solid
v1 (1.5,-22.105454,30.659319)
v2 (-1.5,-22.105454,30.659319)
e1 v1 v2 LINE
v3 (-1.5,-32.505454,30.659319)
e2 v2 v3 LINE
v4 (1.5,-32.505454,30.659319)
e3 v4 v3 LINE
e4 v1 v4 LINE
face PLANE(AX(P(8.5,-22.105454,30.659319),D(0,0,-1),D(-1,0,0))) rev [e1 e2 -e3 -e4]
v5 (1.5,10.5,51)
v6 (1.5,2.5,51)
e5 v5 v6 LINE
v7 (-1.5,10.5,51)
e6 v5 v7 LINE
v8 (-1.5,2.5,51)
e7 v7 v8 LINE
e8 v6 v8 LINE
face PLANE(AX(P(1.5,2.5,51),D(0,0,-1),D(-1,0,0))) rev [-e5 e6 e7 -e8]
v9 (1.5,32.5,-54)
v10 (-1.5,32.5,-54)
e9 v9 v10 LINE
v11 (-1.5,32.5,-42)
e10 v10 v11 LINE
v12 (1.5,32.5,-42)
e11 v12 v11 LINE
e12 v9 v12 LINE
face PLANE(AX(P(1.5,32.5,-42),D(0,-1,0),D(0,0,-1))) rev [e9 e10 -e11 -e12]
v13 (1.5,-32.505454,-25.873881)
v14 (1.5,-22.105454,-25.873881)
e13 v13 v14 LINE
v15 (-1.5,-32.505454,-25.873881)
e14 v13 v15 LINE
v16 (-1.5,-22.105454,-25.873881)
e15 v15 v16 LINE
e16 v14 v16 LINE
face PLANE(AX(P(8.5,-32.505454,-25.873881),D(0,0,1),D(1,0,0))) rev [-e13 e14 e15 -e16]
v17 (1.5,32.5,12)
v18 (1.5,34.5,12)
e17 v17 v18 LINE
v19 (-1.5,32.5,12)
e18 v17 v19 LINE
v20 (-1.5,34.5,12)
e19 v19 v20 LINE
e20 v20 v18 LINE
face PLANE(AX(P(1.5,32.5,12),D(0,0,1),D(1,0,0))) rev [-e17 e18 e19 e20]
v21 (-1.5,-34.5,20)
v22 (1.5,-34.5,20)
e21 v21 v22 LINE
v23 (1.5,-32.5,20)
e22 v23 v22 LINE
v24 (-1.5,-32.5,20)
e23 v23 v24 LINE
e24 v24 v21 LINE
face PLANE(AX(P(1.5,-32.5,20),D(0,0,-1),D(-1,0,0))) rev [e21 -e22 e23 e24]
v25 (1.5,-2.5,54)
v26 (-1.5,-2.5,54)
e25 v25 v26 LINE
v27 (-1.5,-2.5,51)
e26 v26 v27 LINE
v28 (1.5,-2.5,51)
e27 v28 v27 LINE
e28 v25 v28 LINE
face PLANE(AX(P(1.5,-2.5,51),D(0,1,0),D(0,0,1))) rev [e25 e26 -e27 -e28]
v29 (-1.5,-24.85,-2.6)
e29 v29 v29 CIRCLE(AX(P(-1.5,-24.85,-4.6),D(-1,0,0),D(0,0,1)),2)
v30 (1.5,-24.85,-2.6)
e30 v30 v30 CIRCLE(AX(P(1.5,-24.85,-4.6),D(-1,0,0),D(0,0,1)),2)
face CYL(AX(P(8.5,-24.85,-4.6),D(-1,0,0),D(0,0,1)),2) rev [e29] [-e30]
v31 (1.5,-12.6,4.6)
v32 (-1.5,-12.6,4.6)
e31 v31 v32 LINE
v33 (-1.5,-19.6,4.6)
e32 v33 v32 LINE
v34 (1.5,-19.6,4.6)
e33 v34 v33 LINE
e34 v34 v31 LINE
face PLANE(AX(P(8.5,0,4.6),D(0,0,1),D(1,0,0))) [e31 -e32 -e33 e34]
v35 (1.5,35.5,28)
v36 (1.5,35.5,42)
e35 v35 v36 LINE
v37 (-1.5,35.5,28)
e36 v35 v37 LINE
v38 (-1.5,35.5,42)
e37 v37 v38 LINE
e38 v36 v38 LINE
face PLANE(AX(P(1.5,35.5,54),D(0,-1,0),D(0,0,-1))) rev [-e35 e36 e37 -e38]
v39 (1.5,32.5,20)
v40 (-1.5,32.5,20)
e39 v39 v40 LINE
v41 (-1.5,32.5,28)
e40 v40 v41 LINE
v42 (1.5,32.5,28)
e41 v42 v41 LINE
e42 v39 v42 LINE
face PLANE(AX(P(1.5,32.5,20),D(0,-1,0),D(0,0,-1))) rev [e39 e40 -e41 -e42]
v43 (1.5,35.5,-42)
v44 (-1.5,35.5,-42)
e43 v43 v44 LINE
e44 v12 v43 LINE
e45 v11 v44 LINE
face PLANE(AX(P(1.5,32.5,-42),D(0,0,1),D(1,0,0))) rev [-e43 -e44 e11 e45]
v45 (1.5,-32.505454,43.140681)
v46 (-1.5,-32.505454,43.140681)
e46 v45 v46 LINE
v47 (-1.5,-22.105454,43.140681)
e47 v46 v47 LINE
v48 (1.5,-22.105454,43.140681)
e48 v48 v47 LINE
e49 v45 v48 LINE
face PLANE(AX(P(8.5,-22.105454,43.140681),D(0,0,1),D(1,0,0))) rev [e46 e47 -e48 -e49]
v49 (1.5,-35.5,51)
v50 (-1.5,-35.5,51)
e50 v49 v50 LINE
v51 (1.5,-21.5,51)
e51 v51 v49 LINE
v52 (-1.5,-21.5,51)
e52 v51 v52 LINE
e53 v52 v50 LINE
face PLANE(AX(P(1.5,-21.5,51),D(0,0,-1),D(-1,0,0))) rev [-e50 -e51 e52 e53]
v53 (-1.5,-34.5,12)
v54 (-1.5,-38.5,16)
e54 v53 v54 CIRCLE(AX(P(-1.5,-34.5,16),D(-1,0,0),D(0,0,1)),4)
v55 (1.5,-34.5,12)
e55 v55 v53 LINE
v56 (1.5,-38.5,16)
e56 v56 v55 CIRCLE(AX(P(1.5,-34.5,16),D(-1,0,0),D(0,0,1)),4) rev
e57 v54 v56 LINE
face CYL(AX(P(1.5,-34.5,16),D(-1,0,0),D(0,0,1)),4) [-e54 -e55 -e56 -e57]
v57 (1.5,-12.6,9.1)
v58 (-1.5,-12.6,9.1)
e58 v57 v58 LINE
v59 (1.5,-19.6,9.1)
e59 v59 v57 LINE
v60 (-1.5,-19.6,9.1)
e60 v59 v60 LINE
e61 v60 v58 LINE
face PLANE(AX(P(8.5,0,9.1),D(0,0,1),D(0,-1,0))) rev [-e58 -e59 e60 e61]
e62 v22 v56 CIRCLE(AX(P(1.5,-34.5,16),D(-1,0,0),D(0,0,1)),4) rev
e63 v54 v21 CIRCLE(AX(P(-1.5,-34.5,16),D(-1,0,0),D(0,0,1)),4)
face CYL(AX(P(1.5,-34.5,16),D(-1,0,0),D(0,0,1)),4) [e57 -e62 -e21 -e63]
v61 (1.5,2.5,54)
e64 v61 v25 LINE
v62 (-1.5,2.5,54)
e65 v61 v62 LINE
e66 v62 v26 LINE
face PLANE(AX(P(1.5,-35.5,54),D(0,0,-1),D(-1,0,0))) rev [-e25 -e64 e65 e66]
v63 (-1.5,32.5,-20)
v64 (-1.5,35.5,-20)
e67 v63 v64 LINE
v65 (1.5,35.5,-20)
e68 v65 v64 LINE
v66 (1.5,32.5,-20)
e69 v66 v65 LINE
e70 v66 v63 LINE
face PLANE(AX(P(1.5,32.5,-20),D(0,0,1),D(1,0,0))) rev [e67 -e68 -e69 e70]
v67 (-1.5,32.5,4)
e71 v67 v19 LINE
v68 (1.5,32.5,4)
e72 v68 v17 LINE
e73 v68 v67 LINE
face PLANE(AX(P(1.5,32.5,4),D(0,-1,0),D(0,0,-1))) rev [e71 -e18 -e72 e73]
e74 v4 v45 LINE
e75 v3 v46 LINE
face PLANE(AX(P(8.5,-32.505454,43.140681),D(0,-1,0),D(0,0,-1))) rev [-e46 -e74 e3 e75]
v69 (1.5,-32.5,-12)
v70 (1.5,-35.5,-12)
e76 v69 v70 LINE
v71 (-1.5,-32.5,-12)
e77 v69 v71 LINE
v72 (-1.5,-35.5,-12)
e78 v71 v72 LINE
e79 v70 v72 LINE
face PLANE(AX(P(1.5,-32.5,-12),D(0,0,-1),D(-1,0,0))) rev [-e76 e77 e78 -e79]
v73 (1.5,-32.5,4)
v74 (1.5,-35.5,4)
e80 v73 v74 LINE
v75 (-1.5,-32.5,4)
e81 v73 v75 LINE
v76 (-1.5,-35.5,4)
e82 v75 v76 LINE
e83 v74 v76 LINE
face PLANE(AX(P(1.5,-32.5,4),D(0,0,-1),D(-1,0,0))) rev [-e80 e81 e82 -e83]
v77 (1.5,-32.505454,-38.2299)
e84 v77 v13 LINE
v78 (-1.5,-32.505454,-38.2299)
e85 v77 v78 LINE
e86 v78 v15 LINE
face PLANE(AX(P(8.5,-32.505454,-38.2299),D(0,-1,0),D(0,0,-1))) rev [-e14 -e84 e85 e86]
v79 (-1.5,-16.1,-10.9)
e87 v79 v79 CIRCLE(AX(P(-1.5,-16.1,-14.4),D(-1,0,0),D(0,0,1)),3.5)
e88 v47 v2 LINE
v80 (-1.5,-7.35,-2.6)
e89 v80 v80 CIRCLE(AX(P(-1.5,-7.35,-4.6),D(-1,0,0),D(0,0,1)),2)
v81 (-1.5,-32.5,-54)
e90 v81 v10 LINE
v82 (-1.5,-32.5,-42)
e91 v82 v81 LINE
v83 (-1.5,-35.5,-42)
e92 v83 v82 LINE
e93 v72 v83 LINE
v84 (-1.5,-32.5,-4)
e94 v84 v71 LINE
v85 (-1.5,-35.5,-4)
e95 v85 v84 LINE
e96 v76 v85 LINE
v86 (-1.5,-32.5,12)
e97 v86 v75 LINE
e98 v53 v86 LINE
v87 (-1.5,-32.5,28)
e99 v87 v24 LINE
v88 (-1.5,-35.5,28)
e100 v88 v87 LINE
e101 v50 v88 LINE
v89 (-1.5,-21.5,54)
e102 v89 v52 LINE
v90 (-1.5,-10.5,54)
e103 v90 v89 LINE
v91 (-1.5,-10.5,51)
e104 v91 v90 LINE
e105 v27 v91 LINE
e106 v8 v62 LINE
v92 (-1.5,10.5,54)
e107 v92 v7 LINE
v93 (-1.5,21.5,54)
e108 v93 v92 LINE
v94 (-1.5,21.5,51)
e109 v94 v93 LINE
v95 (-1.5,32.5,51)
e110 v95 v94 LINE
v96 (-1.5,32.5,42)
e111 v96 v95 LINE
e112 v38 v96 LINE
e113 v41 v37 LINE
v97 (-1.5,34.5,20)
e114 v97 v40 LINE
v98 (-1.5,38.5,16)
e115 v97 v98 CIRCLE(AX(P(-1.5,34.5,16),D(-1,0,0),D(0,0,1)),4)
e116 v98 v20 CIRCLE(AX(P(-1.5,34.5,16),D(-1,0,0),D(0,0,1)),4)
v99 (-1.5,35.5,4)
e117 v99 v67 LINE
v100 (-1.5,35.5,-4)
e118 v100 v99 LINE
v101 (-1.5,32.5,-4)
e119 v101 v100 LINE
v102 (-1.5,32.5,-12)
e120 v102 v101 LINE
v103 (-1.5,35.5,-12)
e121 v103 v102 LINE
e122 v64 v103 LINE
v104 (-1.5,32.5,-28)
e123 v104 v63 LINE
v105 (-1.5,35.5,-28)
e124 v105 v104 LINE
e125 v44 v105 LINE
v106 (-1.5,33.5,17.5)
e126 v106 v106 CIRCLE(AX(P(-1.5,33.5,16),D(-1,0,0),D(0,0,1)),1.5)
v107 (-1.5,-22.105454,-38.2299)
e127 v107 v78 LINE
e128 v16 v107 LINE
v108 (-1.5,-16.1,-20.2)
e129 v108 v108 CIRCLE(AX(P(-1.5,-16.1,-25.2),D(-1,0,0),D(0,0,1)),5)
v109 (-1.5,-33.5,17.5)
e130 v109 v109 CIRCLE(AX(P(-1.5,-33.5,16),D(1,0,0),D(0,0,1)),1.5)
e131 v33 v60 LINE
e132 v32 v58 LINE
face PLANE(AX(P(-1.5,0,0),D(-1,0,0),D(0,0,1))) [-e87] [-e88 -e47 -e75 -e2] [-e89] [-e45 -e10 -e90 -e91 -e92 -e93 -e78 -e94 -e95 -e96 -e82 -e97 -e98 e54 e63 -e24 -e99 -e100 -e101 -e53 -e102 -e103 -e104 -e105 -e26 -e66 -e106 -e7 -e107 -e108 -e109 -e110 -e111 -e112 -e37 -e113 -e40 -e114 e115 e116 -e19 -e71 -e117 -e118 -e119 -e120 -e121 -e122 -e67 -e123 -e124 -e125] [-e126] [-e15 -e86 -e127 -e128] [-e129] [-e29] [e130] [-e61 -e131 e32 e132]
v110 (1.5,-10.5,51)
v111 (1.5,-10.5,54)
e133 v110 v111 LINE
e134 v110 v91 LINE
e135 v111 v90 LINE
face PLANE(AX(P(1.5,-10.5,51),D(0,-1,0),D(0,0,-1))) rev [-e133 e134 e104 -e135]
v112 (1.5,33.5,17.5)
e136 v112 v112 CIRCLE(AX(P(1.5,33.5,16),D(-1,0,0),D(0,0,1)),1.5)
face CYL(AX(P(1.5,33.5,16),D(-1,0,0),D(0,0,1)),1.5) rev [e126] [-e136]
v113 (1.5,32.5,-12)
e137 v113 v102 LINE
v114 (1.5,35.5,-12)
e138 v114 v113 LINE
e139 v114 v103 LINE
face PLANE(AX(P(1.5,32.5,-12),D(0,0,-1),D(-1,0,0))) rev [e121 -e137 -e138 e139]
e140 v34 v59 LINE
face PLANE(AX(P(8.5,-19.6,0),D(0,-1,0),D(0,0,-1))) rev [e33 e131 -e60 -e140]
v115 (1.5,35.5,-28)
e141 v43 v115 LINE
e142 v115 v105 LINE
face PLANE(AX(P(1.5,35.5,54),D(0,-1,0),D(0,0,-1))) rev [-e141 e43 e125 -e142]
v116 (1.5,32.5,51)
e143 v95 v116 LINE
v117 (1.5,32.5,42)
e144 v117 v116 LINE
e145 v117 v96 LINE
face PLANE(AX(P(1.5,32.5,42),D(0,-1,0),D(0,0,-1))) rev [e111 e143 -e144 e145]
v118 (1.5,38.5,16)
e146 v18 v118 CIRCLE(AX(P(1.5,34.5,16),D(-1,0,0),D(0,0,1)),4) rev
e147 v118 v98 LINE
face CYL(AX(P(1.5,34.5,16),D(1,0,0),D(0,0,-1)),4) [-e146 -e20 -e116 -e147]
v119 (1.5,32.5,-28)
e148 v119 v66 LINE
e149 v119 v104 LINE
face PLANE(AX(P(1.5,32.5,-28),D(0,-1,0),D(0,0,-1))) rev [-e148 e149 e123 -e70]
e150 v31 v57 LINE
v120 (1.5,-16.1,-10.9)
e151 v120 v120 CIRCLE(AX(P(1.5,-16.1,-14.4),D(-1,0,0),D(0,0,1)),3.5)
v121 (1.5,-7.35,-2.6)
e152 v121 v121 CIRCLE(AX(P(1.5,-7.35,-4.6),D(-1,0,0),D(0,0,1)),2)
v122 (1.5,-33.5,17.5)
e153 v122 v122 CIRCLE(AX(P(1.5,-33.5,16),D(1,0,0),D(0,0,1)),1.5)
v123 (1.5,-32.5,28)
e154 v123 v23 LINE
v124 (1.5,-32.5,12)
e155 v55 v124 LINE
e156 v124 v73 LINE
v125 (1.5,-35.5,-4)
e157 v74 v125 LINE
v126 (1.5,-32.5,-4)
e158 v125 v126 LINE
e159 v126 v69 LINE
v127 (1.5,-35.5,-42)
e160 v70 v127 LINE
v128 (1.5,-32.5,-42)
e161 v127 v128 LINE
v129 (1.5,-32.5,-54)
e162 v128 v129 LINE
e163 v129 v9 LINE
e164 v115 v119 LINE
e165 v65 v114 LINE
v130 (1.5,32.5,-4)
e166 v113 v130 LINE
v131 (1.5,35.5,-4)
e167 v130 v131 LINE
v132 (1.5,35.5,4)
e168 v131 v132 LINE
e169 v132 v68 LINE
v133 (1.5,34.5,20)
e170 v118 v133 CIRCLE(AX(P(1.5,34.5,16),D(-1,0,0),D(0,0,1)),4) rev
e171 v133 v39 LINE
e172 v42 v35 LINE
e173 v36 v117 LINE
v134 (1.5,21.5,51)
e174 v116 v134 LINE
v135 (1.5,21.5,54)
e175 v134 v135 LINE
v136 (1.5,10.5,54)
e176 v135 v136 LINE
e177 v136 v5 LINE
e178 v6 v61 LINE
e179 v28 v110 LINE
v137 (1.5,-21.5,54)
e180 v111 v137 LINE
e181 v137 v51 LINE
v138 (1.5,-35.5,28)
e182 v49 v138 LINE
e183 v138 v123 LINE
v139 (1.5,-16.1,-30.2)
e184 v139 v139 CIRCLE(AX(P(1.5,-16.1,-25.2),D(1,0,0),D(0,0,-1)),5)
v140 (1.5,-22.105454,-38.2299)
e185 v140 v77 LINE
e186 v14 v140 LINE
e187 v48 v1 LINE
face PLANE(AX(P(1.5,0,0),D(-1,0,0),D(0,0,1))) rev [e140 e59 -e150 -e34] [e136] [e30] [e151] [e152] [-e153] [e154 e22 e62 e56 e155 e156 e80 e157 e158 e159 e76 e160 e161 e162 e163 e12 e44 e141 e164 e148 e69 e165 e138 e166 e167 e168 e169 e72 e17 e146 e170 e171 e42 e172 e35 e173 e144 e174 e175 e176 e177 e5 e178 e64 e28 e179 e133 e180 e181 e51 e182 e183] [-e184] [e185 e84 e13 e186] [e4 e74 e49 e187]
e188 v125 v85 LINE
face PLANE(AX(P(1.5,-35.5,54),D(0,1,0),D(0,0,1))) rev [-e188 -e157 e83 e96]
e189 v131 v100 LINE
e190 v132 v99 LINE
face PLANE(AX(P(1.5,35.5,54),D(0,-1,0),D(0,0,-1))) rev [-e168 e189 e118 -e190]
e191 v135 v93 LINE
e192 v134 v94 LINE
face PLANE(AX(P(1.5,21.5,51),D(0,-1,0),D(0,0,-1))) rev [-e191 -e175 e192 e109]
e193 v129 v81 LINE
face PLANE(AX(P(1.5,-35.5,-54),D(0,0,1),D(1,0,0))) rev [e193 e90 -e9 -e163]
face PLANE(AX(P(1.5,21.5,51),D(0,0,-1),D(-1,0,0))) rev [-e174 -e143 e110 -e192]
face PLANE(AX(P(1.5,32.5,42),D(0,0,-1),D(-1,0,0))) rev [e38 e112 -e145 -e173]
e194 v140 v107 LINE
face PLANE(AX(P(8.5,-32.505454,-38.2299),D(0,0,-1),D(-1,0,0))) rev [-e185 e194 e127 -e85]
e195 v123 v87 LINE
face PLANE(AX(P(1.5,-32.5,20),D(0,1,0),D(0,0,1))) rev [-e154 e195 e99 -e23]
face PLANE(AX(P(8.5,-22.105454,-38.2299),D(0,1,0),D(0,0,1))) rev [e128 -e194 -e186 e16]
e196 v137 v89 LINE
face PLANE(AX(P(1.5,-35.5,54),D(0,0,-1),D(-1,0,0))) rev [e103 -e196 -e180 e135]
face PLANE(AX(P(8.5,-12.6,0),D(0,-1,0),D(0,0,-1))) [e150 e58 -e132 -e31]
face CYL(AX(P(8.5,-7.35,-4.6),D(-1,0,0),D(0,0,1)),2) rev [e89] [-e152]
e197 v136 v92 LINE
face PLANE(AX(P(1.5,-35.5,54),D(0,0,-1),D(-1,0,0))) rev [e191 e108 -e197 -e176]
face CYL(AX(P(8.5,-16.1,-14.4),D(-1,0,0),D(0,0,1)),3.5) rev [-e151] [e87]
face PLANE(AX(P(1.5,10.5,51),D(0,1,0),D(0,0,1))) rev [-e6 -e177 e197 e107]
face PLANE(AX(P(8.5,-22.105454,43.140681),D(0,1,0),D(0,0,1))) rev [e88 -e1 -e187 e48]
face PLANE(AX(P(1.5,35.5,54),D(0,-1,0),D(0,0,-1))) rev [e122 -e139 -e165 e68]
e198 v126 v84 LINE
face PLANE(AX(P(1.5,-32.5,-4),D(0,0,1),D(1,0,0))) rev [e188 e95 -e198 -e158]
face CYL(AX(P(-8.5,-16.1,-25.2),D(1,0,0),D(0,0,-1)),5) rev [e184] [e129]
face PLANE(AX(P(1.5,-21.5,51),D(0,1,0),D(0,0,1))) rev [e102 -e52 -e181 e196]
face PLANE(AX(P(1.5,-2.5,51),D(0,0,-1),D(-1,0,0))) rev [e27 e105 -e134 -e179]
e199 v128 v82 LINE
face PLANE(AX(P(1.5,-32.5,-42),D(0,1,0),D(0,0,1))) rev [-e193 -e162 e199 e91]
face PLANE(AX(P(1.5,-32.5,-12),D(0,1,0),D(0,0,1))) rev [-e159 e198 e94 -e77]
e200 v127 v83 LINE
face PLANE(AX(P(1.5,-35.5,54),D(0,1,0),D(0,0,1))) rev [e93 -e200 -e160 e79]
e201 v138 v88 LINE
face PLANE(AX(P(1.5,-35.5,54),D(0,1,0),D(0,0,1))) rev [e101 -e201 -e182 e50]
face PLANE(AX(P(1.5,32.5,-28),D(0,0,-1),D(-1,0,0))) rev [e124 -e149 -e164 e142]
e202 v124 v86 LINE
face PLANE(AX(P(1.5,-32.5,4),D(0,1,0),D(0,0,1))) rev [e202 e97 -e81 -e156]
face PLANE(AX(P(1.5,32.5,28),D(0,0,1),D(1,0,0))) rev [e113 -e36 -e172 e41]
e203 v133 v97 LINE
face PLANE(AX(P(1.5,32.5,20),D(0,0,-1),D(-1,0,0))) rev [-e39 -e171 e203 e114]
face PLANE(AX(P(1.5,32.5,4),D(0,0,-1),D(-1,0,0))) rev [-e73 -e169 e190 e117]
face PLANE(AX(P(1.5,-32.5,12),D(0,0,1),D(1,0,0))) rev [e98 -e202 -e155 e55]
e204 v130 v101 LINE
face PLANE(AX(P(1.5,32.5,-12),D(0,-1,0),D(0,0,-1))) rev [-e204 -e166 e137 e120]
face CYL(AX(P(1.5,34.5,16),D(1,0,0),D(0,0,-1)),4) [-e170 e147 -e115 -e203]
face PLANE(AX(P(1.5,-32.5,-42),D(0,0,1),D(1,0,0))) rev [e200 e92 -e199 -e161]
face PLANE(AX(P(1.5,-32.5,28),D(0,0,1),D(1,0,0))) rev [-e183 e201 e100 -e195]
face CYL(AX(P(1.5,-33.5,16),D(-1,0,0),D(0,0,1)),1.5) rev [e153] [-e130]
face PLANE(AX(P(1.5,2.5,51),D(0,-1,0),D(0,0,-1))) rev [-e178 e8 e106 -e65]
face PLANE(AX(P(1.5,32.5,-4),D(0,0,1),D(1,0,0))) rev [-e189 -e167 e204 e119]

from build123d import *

# Parameters (mm, degrees)
CROQUIS1_W               = 108
CROQUIS1_H               = 71
SALIENTE_EXTRUIR1_DEPTH  = 1.5
CROQUIS2_W               = 12
CROQUIS2_H               = 3
CROQUIS2_W_2             = 8
CORTAR_EXTRUIR1_DEPTH    = 3
CROQUIS6_W               = 3
CROQUIS6_H               = 14
CROQUIS6_H_2             = 8
CORTAR_EXTRUIR3_DEPTH    = 3
CROQUIS8_W               = 8
CROQUIS8_H               = 3
SALIENTE_EXTRUIR2_DEPTH  = 3
REDONDEO2_R              = 4
CROQUIS9_R               = 1.5
CORTAR_EXTRUIR5_DEPTH    = 3
REDONDEO2_OF_SIMETR_A1_R = 4
CROQUIS12_W              = 12.481361742
CROQUIS12_H              = 10.4
CROQUIS12_W_2            = 12.356019523
CORTAR_EXTRUIR7_DEPTH    = 10
CROQUIS10_R              = 4.6
CROQUIS10_R_2            = 3.5
CROQUIS10_R_3            = 2
CROQUIS10_W              = 4.5
CROQUIS10_H              = 7
CORTAR_EXTRUIR6_DEPTH    = 10
CROQUIS14_R              = 5
CROQUIS14_R_2            = 0.007419035
CORTAR_EXTRUIR9_DEPTH    = 10


with BuildPart() as part:
    # Croquis1 → Saliente-Extruir1 (new, symmetric)
    with BuildSketch(Plane(origin=(0, 0, 0), x_dir=(0, 0, -1), z_dir=(1, 0, 0))):
        Rectangle(CROQUIS1_W, CROQUIS1_H)
    extrude(amount=SALIENTE_EXTRUIR1_DEPTH, both=True)

    # Croquis2 → Cortar-Extruir1 (cut)
    with BuildSketch(Plane.ZY.offset(1.5)):
        with Locations((-48, -34)):
            Rectangle(CROQUIS2_W, CROQUIS2_H)
        with Locations((-8, -34)):
            Rectangle(CROQUIS2_W_2, CROQUIS2_H)
        with Locations((48, 34)):
            Rectangle(CROQUIS2_W, CROQUIS2_H)
        with Locations((24, 34)):
            Rectangle(CROQUIS2_W_2, CROQUIS2_H)
        with Locations((8, 34)):
            Rectangle(CROQUIS2_W_2, CROQUIS2_H)
        with Locations((-8, 34)):
            Rectangle(CROQUIS2_W_2, CROQUIS2_H)
        with Locations((-24, 34)):
            Rectangle(CROQUIS2_W_2, CROQUIS2_H)
        with Locations((-48, 34)):
            Rectangle(CROQUIS2_W, CROQUIS2_H)
        with Locations((8, -34)):
            Rectangle(CROQUIS2_W_2, CROQUIS2_H)
        with Locations((24, -34)):
            Rectangle(CROQUIS2_W_2, CROQUIS2_H)
    extrude(amount=-CORTAR_EXTRUIR1_DEPTH, mode=Mode.SUBTRACT)

    # Croquis6 → Cortar-Extruir3 (cut)
    with BuildSketch(Plane.ZY.offset(1.5)):
        with Locations((52.5, -28.5)):
            Rectangle(CROQUIS6_W, CROQUIS6_H)
        with Locations((52.5, -6.5)):
            Rectangle(CROQUIS6_W, CROQUIS6_H_2)
        with Locations((52.5, 6.5)):
            Rectangle(CROQUIS6_W, CROQUIS6_H_2)
        with Locations((52.5, 28.5)):
            Rectangle(CROQUIS6_W, CROQUIS6_H)
    extrude(amount=-CORTAR_EXTRUIR3_DEPTH, mode=Mode.SUBTRACT)

    # Croquis8 → Saliente-Extruir2 (add)
    with BuildSketch(Plane.ZY.offset(1.5)):
        with Locations((16, 37)):
            Rectangle(CROQUIS8_W, CROQUIS8_H)
    saliente_extruir2 = extrude(amount=-SALIENTE_EXTRUIR2_DEPTH)

    # Redondeo2
    redondeo2_edges = [part.edges().sort_by_distance(p)[0] for p in [
        (0, 38.5, 20),
        (0, 38.5, 12),
    ]]
    fillet(redondeo2_edges, radius=REDONDEO2_R - 0.0001)  # a hair under: the kernel refuses the full size

    # Croquis9 → Cortar-Extruir5 (cut)
    with BuildSketch(Plane.ZY.offset(1.5)):
        with Locations((16, 33.5)):
            Circle(CROQUIS9_R)
    cortar_extruir5 = extrude(amount=-CORTAR_EXTRUIR5_DEPTH, mode=Mode.SUBTRACT)

    # Simetría1: Saliente-Extruir2, Cortar-Extruir5 across plane
    add(saliente_extruir2.mirror(Plane.ZX))
    add(cortar_extruir5.mirror(Plane.ZX), mode=Mode.SUBTRACT)

    # Redondeo2 of Simetría1
    redondeo2_of_simetr_a1_edges = [part.edges().sort_by_distance(p)[0] for p in [
        (0, -38.5, 20),
        (0, -38.5, 12),
    ]]
    fillet(redondeo2_of_simetr_a1_edges, radius=REDONDEO2_OF_SIMETR_A1_R - 0.0001)  # a hair under: the kernel refuses the full size

    # Croquis12 → Cortar-Extruir7 (cut)
    with BuildSketch(Plane.ZY.offset(1.5)):
        with Locations((36.9, -27.305454422)):
            Rectangle(CROQUIS12_W, CROQUIS12_H)
        with Locations((-32.051890368, -27.305454422)):
            Rectangle(CROQUIS12_W_2, CROQUIS12_H)
    extrude(amount=-CORTAR_EXTRUIR7_DEPTH, mode=Mode.SUBTRACT)

    # Croquis10 → Cortar-Extruir6 (cut)
    with BuildSketch(Plane.ZY.offset(1.5)):
        with Locations((-25.2, -16.1)):
            Circle(CROQUIS10_R)
        with Locations((-14.4, -16.1)):
            Circle(CROQUIS10_R_2)
        with Locations((-4.6, -24.85)):
            Circle(CROQUIS10_R_3)
        with Locations((6.85, -16.1)):
            Rectangle(CROQUIS10_W, CROQUIS10_H)
        with Locations((-4.6, -7.35)):
            Circle(CROQUIS10_R_3)
    extrude(amount=-CORTAR_EXTRUIR6_DEPTH, mode=Mode.SUBTRACT)

    # Croquis14 → Cortar-Extruir9 (cut)
    with BuildSketch(Plane(origin=(1.5, 0, 0), x_dir=(0, 0, -1), z_dir=(1, 0, 0))):
        with Locations((25.2, -16.1)):
            Circle(CROQUIS14_R)
        with Locations((21.161787618, -13.912617849)):
            Circle(CROQUIS14_R_2, mode=Mode.SUBTRACT)
    extrude(amount=-CORTAR_EXTRUIR9_DEPTH, mode=Mode.SUBTRACT)


solid = part.part
